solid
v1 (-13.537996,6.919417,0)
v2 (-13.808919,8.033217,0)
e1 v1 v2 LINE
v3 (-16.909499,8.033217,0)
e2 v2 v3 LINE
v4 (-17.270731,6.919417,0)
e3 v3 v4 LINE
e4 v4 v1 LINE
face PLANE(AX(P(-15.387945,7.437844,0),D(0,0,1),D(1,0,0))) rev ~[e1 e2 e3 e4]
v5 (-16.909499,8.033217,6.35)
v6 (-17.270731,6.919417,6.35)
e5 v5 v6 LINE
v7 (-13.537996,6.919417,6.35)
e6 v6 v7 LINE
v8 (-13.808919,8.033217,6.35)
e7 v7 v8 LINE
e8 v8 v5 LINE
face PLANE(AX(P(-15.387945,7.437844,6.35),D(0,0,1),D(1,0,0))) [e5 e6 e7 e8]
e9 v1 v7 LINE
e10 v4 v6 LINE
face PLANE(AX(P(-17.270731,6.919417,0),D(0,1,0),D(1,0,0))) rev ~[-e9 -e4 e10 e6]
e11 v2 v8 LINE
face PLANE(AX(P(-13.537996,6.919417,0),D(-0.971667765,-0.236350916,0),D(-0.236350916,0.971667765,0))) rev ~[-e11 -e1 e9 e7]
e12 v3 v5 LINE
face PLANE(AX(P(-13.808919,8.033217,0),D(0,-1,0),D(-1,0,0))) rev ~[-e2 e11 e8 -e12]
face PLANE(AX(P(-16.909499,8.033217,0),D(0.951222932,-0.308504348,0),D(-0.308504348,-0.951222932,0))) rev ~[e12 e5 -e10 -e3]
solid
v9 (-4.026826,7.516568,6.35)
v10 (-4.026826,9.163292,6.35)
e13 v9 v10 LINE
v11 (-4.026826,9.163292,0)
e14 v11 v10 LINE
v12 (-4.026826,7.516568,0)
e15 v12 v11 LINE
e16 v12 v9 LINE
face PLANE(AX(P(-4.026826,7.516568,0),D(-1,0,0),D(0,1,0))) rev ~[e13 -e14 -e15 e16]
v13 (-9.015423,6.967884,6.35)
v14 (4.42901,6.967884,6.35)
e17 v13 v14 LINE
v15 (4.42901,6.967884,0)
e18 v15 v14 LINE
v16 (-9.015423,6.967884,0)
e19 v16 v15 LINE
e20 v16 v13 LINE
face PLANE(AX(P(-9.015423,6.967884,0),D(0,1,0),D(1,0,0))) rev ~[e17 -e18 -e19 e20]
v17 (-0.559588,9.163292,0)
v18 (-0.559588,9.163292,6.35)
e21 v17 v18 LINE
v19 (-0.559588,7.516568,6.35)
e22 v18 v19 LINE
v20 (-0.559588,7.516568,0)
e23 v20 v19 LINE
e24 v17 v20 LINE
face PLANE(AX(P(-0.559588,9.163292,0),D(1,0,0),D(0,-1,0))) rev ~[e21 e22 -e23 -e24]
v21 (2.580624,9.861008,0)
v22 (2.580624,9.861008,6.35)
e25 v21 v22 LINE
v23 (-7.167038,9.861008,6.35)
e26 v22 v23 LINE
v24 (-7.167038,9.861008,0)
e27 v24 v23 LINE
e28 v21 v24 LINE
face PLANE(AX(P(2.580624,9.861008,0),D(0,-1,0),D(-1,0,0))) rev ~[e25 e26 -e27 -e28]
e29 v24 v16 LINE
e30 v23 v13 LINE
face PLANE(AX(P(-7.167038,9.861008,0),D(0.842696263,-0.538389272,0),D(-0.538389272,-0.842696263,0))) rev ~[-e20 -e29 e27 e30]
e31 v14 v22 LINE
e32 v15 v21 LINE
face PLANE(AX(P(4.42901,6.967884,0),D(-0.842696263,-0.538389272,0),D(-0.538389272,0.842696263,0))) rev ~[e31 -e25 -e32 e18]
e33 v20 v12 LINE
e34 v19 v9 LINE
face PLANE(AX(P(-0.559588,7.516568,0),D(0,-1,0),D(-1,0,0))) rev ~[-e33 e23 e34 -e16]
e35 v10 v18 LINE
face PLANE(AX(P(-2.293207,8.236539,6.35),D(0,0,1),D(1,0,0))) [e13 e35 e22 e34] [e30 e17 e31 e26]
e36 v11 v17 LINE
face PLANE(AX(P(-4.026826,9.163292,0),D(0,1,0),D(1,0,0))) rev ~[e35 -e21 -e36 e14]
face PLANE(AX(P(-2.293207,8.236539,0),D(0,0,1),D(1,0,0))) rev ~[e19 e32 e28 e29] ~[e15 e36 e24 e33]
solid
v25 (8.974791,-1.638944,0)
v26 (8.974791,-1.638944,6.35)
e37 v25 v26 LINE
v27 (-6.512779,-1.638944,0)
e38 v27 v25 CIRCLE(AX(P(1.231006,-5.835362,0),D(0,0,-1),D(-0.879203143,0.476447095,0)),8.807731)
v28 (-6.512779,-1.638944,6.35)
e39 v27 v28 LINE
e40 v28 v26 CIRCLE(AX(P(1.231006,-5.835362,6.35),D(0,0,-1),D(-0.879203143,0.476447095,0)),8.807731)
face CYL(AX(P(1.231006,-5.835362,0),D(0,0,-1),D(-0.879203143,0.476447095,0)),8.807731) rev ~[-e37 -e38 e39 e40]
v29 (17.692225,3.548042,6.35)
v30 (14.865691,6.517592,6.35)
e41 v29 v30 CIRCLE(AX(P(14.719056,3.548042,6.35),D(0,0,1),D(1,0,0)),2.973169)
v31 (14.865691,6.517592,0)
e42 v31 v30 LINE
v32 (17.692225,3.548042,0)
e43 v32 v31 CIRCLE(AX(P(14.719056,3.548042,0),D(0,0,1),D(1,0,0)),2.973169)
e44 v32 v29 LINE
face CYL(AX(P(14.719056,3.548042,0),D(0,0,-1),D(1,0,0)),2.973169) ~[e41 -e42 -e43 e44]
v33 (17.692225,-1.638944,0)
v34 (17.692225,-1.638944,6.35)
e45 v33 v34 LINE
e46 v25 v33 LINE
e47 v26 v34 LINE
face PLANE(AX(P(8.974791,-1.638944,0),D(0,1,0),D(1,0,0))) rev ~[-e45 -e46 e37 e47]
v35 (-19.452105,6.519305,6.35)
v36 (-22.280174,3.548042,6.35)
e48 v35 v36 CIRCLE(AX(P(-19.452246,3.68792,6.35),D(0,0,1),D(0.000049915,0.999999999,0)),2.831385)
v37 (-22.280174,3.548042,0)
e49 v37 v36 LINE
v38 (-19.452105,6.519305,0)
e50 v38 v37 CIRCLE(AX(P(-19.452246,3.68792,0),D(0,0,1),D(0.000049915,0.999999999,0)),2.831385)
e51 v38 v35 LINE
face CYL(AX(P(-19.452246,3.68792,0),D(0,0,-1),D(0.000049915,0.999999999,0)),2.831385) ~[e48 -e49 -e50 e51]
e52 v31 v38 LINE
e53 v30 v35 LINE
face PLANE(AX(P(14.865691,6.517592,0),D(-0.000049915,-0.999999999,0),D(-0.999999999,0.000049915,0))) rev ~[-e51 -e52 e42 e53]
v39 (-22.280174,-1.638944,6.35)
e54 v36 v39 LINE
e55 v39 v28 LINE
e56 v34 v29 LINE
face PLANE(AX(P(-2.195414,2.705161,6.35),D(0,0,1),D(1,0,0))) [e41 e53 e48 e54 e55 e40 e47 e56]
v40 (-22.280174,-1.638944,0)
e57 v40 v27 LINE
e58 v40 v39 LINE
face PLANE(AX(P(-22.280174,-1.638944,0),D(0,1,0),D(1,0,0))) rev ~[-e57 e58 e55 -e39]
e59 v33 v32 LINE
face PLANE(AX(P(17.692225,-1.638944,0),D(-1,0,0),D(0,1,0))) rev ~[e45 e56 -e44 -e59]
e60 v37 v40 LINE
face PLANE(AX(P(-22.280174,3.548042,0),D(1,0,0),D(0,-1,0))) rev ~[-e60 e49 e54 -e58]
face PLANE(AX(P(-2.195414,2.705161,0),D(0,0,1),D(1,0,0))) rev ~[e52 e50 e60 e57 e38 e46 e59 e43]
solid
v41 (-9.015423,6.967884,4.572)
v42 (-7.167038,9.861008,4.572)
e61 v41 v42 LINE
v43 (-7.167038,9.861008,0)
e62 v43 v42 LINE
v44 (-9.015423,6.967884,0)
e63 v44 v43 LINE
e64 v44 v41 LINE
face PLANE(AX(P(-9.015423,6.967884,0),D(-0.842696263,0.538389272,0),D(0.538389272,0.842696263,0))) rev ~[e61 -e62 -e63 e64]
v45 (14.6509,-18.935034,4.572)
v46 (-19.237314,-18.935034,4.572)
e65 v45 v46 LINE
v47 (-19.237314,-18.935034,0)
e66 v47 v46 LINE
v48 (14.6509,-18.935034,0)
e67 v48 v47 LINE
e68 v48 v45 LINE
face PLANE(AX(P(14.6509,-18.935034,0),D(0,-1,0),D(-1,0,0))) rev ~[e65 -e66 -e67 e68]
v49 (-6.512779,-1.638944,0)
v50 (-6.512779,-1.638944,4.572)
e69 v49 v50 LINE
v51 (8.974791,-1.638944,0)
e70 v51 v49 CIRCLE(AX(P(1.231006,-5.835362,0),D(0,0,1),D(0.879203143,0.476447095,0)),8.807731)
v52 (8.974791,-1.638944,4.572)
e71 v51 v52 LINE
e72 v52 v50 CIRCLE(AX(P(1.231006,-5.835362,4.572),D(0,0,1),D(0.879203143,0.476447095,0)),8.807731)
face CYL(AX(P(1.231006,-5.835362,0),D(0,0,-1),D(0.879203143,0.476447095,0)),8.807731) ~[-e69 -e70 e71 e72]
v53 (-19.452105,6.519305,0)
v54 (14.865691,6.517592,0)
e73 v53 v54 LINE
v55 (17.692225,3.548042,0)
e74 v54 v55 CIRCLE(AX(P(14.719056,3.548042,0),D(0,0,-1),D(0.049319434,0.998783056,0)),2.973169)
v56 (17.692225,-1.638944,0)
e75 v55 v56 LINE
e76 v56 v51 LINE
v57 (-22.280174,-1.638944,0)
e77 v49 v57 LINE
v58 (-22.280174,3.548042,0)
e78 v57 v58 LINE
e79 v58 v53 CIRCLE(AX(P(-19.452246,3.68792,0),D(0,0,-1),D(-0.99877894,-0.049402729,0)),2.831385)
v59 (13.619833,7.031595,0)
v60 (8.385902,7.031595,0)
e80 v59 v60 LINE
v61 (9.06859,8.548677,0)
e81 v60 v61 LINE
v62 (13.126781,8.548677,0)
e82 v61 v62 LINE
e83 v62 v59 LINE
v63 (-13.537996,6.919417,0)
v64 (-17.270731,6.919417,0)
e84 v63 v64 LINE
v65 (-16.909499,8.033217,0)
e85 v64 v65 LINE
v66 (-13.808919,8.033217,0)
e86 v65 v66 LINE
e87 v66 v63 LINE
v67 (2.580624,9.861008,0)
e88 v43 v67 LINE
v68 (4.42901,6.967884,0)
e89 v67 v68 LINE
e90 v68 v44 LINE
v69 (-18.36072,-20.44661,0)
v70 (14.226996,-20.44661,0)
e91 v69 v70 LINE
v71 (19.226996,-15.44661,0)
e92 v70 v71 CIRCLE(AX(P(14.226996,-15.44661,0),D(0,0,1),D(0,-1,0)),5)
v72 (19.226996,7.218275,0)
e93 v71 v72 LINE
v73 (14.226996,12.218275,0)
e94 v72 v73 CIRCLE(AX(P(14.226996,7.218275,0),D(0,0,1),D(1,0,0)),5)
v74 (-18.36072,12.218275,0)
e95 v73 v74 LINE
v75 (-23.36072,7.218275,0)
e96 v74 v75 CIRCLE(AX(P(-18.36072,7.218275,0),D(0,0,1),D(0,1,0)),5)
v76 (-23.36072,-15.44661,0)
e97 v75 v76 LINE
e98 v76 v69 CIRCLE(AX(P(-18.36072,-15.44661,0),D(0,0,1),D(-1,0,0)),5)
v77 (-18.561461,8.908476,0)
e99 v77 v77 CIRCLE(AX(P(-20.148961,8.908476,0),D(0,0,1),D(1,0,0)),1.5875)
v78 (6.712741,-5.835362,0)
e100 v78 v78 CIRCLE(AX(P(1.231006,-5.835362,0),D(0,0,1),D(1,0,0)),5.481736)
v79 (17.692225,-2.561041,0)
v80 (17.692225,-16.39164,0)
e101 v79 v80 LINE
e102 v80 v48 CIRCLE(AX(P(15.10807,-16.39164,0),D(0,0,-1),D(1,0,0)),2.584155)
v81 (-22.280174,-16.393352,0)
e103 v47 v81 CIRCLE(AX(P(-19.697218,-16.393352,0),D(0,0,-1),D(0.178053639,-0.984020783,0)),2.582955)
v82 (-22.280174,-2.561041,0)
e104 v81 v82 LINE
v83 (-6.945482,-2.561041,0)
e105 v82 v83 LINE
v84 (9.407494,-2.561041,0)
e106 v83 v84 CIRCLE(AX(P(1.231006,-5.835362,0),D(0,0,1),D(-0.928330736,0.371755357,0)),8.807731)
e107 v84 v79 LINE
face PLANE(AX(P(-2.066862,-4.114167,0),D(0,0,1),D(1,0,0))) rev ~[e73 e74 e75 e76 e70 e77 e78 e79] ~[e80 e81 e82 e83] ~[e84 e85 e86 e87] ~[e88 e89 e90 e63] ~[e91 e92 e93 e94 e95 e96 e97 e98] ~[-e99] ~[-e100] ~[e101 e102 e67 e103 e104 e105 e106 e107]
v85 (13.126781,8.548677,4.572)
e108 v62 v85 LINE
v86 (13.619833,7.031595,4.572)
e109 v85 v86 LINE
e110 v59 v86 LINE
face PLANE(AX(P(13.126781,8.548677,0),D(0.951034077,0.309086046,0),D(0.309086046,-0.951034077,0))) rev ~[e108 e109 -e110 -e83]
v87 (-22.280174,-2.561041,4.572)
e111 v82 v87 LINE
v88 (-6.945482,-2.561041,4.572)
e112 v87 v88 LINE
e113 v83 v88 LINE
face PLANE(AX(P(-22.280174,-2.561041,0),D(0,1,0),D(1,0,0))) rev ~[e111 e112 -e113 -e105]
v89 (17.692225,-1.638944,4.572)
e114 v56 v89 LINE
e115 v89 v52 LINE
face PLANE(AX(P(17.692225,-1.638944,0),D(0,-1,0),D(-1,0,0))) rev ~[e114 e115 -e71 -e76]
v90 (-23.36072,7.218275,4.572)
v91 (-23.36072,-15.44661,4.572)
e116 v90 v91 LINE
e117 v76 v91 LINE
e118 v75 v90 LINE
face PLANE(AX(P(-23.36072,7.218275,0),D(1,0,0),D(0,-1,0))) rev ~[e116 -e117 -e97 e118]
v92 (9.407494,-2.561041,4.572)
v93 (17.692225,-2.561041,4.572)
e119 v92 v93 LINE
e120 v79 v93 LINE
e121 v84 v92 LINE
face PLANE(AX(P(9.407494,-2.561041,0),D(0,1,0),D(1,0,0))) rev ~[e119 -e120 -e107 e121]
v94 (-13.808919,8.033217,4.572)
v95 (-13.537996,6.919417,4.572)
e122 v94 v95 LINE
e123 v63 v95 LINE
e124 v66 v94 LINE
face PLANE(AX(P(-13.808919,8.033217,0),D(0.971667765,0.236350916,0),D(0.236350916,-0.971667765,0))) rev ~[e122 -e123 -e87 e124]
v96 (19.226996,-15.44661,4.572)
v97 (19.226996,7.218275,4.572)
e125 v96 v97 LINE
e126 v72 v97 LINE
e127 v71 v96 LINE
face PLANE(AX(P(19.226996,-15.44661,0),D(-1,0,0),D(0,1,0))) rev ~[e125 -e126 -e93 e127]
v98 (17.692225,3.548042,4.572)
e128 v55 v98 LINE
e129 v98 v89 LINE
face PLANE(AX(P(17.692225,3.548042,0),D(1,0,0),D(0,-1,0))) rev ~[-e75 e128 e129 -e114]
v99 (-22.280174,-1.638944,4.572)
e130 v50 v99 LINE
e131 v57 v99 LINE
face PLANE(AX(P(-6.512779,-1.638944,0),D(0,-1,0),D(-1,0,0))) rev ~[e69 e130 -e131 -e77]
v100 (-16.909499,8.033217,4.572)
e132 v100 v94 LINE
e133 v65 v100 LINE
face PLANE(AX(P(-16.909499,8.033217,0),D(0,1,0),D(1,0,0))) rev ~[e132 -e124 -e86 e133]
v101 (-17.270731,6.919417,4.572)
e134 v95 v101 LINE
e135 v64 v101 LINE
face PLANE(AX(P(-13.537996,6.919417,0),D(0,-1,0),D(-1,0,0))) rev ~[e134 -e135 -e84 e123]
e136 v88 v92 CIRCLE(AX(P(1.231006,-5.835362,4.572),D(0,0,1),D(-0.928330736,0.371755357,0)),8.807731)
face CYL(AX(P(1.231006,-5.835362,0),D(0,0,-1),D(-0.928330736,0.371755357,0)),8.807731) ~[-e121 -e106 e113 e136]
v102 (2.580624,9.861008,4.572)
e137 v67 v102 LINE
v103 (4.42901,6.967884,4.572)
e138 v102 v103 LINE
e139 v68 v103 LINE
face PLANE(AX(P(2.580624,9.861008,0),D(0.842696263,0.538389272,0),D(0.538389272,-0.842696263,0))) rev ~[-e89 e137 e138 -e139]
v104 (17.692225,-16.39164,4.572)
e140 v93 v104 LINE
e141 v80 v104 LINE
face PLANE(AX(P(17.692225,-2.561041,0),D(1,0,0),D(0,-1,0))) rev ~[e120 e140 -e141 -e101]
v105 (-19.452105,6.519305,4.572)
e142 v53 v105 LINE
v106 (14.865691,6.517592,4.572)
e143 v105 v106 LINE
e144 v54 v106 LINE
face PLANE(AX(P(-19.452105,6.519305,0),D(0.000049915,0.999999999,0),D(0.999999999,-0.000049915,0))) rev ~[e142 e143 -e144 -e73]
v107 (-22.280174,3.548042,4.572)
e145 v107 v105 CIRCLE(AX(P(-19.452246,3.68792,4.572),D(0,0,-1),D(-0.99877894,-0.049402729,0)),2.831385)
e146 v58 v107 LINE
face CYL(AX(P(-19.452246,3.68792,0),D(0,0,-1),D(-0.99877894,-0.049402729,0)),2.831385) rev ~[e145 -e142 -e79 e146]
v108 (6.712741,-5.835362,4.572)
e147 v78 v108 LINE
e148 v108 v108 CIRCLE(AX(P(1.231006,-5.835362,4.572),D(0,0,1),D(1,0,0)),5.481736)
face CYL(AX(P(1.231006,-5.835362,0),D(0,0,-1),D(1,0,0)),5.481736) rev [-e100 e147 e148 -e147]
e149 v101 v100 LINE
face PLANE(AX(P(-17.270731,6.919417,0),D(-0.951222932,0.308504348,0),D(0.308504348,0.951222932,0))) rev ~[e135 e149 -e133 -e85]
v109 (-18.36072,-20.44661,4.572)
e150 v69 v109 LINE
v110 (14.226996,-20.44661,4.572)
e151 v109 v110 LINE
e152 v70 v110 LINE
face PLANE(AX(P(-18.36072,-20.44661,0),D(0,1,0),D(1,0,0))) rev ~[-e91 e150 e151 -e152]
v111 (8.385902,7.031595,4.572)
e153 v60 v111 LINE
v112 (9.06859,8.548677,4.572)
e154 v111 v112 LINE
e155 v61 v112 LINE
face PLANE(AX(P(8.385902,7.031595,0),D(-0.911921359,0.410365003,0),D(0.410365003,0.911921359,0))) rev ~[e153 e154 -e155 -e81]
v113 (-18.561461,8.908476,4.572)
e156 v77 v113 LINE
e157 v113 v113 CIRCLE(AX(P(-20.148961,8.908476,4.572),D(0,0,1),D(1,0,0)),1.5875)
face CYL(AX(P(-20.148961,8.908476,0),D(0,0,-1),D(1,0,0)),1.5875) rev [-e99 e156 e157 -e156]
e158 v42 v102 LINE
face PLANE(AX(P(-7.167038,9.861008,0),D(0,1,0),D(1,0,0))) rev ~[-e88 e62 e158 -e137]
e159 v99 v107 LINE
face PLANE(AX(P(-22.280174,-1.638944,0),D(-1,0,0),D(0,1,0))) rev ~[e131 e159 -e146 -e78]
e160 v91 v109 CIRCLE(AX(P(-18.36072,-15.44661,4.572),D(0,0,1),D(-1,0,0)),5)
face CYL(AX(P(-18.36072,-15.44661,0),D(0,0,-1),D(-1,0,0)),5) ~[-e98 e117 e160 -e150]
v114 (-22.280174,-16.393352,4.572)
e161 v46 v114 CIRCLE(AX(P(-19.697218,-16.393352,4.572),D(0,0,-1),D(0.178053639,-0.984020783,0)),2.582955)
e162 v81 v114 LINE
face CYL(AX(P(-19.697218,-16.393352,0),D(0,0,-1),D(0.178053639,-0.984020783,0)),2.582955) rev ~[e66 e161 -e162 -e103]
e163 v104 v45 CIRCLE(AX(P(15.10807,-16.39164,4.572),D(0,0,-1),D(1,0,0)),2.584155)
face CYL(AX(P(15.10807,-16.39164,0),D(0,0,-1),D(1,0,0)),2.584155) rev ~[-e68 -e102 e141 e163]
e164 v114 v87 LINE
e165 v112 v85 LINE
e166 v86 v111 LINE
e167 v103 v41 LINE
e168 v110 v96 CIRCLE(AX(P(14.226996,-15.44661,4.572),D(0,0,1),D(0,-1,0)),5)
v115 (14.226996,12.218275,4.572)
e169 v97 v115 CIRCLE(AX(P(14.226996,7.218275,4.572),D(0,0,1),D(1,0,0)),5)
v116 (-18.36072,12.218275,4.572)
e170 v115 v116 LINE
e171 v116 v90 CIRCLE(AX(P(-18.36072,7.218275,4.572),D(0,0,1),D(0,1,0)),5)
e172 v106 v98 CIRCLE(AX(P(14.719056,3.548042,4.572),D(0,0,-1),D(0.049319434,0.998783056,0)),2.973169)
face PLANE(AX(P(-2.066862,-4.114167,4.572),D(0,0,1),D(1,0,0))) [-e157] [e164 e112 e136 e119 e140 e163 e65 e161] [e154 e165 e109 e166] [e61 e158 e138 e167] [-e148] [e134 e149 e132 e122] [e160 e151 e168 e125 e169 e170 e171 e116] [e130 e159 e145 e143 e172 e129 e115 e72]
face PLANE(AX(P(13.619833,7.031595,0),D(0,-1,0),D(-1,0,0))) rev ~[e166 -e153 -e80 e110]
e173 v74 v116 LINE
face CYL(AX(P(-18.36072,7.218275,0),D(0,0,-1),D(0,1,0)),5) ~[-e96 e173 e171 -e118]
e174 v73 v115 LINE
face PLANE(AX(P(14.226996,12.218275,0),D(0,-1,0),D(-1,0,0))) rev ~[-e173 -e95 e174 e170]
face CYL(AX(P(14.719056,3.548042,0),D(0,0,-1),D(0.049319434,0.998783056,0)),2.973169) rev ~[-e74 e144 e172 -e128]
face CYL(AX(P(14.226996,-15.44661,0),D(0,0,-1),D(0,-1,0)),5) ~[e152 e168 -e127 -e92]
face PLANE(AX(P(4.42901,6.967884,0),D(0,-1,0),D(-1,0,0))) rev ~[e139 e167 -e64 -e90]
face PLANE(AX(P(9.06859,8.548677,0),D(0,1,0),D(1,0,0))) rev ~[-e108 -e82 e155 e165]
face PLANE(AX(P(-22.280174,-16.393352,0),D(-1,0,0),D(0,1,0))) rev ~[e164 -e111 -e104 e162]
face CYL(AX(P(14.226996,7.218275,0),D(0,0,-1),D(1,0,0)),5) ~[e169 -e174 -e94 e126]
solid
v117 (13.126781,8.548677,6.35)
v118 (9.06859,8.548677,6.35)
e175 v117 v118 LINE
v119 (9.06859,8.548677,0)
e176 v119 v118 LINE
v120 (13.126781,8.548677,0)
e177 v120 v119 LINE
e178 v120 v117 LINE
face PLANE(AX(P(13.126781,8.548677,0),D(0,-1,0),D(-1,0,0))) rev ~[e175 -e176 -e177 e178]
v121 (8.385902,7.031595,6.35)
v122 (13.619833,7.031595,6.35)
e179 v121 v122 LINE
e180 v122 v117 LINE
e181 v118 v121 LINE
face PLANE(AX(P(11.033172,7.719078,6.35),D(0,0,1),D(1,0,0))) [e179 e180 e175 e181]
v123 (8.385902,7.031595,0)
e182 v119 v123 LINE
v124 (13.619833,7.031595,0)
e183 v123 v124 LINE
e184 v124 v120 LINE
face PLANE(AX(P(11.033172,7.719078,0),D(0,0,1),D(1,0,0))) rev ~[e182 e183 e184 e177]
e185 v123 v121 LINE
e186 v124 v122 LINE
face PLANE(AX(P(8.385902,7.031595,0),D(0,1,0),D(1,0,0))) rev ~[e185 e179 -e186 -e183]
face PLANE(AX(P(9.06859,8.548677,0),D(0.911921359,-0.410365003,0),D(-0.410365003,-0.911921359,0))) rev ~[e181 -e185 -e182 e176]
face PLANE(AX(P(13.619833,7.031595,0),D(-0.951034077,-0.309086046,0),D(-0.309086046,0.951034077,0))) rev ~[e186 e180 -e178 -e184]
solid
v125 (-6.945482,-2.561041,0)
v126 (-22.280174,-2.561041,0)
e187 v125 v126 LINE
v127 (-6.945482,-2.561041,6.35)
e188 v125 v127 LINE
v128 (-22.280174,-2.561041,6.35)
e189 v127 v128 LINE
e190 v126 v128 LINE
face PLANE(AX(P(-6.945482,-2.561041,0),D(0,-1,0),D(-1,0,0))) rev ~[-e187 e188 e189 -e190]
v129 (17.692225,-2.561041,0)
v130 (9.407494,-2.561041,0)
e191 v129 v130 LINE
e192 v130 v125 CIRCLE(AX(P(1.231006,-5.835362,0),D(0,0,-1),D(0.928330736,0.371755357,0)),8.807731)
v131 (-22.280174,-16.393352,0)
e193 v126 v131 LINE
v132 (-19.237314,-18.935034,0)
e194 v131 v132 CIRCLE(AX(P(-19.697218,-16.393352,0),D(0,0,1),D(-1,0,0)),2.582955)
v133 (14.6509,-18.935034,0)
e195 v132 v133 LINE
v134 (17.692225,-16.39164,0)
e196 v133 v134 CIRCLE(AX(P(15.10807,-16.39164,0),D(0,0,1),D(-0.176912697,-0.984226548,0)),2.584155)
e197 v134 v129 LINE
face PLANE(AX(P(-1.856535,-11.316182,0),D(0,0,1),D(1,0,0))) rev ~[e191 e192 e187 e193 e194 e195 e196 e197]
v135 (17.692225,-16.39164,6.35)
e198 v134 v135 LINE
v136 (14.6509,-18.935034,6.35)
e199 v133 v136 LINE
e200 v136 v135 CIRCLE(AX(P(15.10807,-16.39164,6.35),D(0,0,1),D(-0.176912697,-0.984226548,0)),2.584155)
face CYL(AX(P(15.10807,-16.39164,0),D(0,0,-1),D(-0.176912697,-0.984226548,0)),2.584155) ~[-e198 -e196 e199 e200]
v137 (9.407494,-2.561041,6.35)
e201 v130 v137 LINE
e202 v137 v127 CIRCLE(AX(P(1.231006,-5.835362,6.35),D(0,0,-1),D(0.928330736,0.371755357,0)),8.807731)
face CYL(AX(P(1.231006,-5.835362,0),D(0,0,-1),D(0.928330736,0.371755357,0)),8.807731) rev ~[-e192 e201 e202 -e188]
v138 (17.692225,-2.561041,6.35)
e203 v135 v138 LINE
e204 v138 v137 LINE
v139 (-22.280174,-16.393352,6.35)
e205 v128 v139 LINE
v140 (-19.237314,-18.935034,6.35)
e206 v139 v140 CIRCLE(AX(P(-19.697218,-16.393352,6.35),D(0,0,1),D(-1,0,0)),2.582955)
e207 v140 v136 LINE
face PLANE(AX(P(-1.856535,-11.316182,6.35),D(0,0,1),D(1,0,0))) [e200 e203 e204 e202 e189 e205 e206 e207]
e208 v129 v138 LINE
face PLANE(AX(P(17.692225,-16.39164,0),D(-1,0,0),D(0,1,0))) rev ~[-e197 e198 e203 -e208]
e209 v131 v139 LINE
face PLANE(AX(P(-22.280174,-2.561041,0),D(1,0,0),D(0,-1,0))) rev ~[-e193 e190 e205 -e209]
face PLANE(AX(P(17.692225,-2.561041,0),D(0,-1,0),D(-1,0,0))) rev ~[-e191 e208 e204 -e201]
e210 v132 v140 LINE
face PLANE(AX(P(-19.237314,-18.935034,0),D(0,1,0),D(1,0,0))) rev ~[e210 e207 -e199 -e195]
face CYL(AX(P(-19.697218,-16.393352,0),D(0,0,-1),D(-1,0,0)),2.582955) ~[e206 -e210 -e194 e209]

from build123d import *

# Parameters (mm, degrees)
F1_DEPTH = 6.35
F0_R     = 5.481735544
F0_R_2   = 1.5875
F2_DEPTH = 4.572


# Not quite as in the source:
# - ends of sketch curves that miss each other by under 0.0002 mm in the source are joined


with BuildPart() as f1:
    # F0 (on Top) → F1 (new body)
    with BuildSketch(Plane.XY):
        with BuildLine():
            ThreePointArc((-19.4521045311, 6.5193053193), (-21.5031469057, 5.6399822857), (-22.2801735623, 3.5480421826))
            Line((-22.2801735623, 3.5480421826), (-22.2801735623, -1.6389441203))
            Line((-22.2801735623, -1.6389441203), (-6.5127791505, -1.6389441203))
            ThreePointArc((-6.5127791505, -1.6389441203), (1.2310059125, 2.972369205), (8.9747909756, -1.6389441203))
            Line((8.9747909756, -1.6389441203), (17.6922247706, -1.6389441203))
            Line((17.6922247706, -1.6389441203), (17.6922247706, 3.5480415082))
            ThreePointArc((17.6922247706, 3.5480415082), (16.8726231039, 5.5978906933), (14.8656907599, 6.5175923519))
            Line((14.8656907599, 6.5175923519), (-19.4521045311, 6.5193053193))
        make_face()
    extrude(amount=F1_DEPTH)


with BuildPart() as f1b:
    # F0 (on Top) → F1, piece 2 (new body)
    with BuildSketch(Plane.XY):
        with BuildLine():
            Line((-22.2801735623, -2.5610408197), (-22.2801735623, -16.3933522999))
            ThreePointArc((-22.2801735623, -16.3933522999), (-21.3530783029, -18.375721012), (-19.2373136057, -18.9350340515))
            Line((-19.2373136057, -18.9350340515), (-2.2932069786, -18.9350340515))
            Line((-2.2932069786, -18.9350340515), (14.6508998345, -18.9350340515))
            ThreePointArc((14.6508998345, -18.9350340515), (16.7658482764, -18.3739688541), (17.6922247706, -16.3916400069))
            Line((17.6922247706, -16.3916400069), (17.6922247706, -2.5610408197))
            Line((17.6922247706, -2.5610408197), (9.4074936158, -2.5610408197))
            ThreePointArc((9.4074936158, -2.5610408197), (1.2310059125, -14.6430934532), (-6.9454817907, -2.5610408197))
            Line((-6.9454817907, -2.5610408197), (-22.2801735623, -2.5610408197))
        make_face()
    extrude(amount=F1_DEPTH)


with BuildPart() as f1c:
    # F0 (on Top) → F1, piece 3 (new body)
    with BuildSketch(Plane.XY):
        Polygon((2.5806244571, 9.8610082641), (-2.2932067925, 9.8610082641), (-7.1670380421, 9.8610082641), (-9.0154232457, 6.9678835571), (-2.2932067925, 6.9678835571), (4.4290096607, 6.9678835571), align=None)
        Polygon((-4.0268255398, 9.1632921249), (-2.2932067925, 9.1632921249), (-0.5595880453, 9.1632921249), (-0.5595880453, 7.516568061), (-2.2932067925, 7.516568061), (-4.0268255398, 7.516568061), align=None, mode=Mode.SUBTRACT)
    extrude(amount=F1_DEPTH)


with BuildPart() as f1d:
    # F0 (on Top) → F1, piece 4 (new body)
    with BuildSketch(Plane.XY):
        Polygon((-13.8089191169, 8.0332169309), (-16.9094987214, 8.0332169309), (-17.2707308084, 6.919416599), (-16.5636505928, 6.919416599), (-14.1506345941, 6.919416599), (-13.5379955173, 6.919416599), align=None)
    extrude(amount=F1_DEPTH)


with BuildPart() as f1e:
    # F0 (on Top) → F1, piece 5 (new body)
    with BuildSketch(Plane.XY):
        Polygon((9.0685896575, 8.5486769676), (8.3859022707, 7.0315953344), (9.4382846728, 7.0315953344), (12.5052956864, 7.0315953344), (13.6198326945, 7.0315953344), (13.1267812103, 8.5486769676), align=None)
    extrude(amount=F1_DEPTH)


with BuildPart() as f2:
    # F0 (on Top) → F2 (new body)
    with BuildSketch(Plane.XY):
        with BuildLine():
            Line((14.2269962281, 12.2182751074), (-18.3607199043, 12.2182751074))
            ThreePointArc((-18.3607199043, 12.2182751074), (-21.8962538102, 10.7538090134), (-23.3607199043, 7.2182751074))
            Line((-23.3607199043, 7.2182751074), (-23.3607199043, -15.4466097057))
            ThreePointArc((-23.3607199043, -15.4466097057), (-21.8962538102, -18.9821436116), (-18.3607199043, -20.4466097057))
            Line((-18.3607199043, -20.4466097057), (14.2269962281, -20.4466097057))
            ThreePointArc((14.2269962281, -20.4466097057), (17.762530134, -18.9821436116), (19.2269962281, -15.4466097057))
            Line((19.2269962281, -15.4466097057), (19.2269962281, 7.2182751074))
            ThreePointArc((19.2269962281, 7.2182751074), (17.762530134, 10.7538090134), (14.2269962281, 12.2182751074))
        make_face()
        with BuildLine():
            ThreePointArc((-19.2373136057, -18.9350340515), (-21.3530783029, -18.375721012), (-22.2801735623, -16.3933522999))
            Line((-22.2801735623, -16.3933522999), (-22.2801735623, -2.5610408197))
            Line((-22.2801735623, -2.5610408197), (-6.9454817907, -2.5610408197))
            ThreePointArc((-6.9454817907, -2.5610408197), (1.2310059125, -14.6430934532), (9.4074936158, -2.5610408197))
            Line((9.4074936158, -2.5610408197), (17.6922247706, -2.5610408197))
            Line((17.6922247706, -2.5610408197), (17.6922247706, -16.3916400069))
            ThreePointArc((17.6922247706, -16.3916400069), (16.7658482764, -18.3739688541), (14.6508998345, -18.9350340515))
            Line((14.6508998345, -18.9350340515), (-2.2932067925, -18.9350340515))
            Line((-2.2932067925, -18.9350340515), (-19.2373136057, -18.9350340515))
        make_face(mode=Mode.SUBTRACT)
        with Locations((1.2310059125, -5.8353621241)):
            Circle(F0_R, mode=Mode.SUBTRACT)
        with BuildLine():
            Line((-22.2801735623, -1.6389441203), (-22.2801735623, 3.5480421826))
            ThreePointArc((-22.2801735623, 3.5480421826), (-21.5031469057, 5.6399822857), (-19.4521045311, 6.5193053193))
            Line((-19.4521045311, 6.5193053193), (14.8656907599, 6.5175923519))
            ThreePointArc((14.8656907599, 6.5175923519), (16.8726231039, 5.5978906933), (17.6922247706, 3.5480415082))
            Line((17.6922247706, 3.5480415082), (17.6922247706, -1.6389441203))
            Line((17.6922247706, -1.6389441203), (8.9747909756, -1.6389441203))
            ThreePointArc((8.9747909756, -1.6389441203), (1.2310059125, 2.972369205), (-6.5127791505, -1.6389441203))
            Line((-6.5127791505, -1.6389441203), (-22.2801735623, -1.6389441203))
        make_face(mode=Mode.SUBTRACT)
        Polygon((-17.2707308084, 6.919416599), (-16.9094987214, 8.0332169309), (-13.8089191169, 8.0332169309), (-13.5379955173, 6.919416599), (-14.1506345941, 6.919416599), (-16.5636505928, 6.919416599), align=None, mode=Mode.SUBTRACT)
        with Locations((-20.1489608735, 8.9084757492)):
            Circle(F0_R_2, mode=Mode.SUBTRACT)
        Polygon((-7.1670380421, 9.8610082641), (-2.2932067925, 9.8610082641), (2.5806244571, 9.8610082641), (4.4290096607, 6.9678835571), (-2.2932067925, 6.9678835571), (-9.0154232457, 6.9678835571), align=None, mode=Mode.SUBTRACT)
        Polygon((9.4382846728, 7.0315953344), (8.3859022707, 7.0315953344), (9.0685896575, 8.5486769676), (13.1267812103, 8.5486769676), (13.6198326945, 7.0315953344), (12.5052956864, 7.0315953344), align=None, mode=Mode.SUBTRACT)
    extrude(amount=F2_DEPTH)


solid = Compound([f1.part, f1b.part, f1c.part, f1d.part, f1e.part, f2.part])
